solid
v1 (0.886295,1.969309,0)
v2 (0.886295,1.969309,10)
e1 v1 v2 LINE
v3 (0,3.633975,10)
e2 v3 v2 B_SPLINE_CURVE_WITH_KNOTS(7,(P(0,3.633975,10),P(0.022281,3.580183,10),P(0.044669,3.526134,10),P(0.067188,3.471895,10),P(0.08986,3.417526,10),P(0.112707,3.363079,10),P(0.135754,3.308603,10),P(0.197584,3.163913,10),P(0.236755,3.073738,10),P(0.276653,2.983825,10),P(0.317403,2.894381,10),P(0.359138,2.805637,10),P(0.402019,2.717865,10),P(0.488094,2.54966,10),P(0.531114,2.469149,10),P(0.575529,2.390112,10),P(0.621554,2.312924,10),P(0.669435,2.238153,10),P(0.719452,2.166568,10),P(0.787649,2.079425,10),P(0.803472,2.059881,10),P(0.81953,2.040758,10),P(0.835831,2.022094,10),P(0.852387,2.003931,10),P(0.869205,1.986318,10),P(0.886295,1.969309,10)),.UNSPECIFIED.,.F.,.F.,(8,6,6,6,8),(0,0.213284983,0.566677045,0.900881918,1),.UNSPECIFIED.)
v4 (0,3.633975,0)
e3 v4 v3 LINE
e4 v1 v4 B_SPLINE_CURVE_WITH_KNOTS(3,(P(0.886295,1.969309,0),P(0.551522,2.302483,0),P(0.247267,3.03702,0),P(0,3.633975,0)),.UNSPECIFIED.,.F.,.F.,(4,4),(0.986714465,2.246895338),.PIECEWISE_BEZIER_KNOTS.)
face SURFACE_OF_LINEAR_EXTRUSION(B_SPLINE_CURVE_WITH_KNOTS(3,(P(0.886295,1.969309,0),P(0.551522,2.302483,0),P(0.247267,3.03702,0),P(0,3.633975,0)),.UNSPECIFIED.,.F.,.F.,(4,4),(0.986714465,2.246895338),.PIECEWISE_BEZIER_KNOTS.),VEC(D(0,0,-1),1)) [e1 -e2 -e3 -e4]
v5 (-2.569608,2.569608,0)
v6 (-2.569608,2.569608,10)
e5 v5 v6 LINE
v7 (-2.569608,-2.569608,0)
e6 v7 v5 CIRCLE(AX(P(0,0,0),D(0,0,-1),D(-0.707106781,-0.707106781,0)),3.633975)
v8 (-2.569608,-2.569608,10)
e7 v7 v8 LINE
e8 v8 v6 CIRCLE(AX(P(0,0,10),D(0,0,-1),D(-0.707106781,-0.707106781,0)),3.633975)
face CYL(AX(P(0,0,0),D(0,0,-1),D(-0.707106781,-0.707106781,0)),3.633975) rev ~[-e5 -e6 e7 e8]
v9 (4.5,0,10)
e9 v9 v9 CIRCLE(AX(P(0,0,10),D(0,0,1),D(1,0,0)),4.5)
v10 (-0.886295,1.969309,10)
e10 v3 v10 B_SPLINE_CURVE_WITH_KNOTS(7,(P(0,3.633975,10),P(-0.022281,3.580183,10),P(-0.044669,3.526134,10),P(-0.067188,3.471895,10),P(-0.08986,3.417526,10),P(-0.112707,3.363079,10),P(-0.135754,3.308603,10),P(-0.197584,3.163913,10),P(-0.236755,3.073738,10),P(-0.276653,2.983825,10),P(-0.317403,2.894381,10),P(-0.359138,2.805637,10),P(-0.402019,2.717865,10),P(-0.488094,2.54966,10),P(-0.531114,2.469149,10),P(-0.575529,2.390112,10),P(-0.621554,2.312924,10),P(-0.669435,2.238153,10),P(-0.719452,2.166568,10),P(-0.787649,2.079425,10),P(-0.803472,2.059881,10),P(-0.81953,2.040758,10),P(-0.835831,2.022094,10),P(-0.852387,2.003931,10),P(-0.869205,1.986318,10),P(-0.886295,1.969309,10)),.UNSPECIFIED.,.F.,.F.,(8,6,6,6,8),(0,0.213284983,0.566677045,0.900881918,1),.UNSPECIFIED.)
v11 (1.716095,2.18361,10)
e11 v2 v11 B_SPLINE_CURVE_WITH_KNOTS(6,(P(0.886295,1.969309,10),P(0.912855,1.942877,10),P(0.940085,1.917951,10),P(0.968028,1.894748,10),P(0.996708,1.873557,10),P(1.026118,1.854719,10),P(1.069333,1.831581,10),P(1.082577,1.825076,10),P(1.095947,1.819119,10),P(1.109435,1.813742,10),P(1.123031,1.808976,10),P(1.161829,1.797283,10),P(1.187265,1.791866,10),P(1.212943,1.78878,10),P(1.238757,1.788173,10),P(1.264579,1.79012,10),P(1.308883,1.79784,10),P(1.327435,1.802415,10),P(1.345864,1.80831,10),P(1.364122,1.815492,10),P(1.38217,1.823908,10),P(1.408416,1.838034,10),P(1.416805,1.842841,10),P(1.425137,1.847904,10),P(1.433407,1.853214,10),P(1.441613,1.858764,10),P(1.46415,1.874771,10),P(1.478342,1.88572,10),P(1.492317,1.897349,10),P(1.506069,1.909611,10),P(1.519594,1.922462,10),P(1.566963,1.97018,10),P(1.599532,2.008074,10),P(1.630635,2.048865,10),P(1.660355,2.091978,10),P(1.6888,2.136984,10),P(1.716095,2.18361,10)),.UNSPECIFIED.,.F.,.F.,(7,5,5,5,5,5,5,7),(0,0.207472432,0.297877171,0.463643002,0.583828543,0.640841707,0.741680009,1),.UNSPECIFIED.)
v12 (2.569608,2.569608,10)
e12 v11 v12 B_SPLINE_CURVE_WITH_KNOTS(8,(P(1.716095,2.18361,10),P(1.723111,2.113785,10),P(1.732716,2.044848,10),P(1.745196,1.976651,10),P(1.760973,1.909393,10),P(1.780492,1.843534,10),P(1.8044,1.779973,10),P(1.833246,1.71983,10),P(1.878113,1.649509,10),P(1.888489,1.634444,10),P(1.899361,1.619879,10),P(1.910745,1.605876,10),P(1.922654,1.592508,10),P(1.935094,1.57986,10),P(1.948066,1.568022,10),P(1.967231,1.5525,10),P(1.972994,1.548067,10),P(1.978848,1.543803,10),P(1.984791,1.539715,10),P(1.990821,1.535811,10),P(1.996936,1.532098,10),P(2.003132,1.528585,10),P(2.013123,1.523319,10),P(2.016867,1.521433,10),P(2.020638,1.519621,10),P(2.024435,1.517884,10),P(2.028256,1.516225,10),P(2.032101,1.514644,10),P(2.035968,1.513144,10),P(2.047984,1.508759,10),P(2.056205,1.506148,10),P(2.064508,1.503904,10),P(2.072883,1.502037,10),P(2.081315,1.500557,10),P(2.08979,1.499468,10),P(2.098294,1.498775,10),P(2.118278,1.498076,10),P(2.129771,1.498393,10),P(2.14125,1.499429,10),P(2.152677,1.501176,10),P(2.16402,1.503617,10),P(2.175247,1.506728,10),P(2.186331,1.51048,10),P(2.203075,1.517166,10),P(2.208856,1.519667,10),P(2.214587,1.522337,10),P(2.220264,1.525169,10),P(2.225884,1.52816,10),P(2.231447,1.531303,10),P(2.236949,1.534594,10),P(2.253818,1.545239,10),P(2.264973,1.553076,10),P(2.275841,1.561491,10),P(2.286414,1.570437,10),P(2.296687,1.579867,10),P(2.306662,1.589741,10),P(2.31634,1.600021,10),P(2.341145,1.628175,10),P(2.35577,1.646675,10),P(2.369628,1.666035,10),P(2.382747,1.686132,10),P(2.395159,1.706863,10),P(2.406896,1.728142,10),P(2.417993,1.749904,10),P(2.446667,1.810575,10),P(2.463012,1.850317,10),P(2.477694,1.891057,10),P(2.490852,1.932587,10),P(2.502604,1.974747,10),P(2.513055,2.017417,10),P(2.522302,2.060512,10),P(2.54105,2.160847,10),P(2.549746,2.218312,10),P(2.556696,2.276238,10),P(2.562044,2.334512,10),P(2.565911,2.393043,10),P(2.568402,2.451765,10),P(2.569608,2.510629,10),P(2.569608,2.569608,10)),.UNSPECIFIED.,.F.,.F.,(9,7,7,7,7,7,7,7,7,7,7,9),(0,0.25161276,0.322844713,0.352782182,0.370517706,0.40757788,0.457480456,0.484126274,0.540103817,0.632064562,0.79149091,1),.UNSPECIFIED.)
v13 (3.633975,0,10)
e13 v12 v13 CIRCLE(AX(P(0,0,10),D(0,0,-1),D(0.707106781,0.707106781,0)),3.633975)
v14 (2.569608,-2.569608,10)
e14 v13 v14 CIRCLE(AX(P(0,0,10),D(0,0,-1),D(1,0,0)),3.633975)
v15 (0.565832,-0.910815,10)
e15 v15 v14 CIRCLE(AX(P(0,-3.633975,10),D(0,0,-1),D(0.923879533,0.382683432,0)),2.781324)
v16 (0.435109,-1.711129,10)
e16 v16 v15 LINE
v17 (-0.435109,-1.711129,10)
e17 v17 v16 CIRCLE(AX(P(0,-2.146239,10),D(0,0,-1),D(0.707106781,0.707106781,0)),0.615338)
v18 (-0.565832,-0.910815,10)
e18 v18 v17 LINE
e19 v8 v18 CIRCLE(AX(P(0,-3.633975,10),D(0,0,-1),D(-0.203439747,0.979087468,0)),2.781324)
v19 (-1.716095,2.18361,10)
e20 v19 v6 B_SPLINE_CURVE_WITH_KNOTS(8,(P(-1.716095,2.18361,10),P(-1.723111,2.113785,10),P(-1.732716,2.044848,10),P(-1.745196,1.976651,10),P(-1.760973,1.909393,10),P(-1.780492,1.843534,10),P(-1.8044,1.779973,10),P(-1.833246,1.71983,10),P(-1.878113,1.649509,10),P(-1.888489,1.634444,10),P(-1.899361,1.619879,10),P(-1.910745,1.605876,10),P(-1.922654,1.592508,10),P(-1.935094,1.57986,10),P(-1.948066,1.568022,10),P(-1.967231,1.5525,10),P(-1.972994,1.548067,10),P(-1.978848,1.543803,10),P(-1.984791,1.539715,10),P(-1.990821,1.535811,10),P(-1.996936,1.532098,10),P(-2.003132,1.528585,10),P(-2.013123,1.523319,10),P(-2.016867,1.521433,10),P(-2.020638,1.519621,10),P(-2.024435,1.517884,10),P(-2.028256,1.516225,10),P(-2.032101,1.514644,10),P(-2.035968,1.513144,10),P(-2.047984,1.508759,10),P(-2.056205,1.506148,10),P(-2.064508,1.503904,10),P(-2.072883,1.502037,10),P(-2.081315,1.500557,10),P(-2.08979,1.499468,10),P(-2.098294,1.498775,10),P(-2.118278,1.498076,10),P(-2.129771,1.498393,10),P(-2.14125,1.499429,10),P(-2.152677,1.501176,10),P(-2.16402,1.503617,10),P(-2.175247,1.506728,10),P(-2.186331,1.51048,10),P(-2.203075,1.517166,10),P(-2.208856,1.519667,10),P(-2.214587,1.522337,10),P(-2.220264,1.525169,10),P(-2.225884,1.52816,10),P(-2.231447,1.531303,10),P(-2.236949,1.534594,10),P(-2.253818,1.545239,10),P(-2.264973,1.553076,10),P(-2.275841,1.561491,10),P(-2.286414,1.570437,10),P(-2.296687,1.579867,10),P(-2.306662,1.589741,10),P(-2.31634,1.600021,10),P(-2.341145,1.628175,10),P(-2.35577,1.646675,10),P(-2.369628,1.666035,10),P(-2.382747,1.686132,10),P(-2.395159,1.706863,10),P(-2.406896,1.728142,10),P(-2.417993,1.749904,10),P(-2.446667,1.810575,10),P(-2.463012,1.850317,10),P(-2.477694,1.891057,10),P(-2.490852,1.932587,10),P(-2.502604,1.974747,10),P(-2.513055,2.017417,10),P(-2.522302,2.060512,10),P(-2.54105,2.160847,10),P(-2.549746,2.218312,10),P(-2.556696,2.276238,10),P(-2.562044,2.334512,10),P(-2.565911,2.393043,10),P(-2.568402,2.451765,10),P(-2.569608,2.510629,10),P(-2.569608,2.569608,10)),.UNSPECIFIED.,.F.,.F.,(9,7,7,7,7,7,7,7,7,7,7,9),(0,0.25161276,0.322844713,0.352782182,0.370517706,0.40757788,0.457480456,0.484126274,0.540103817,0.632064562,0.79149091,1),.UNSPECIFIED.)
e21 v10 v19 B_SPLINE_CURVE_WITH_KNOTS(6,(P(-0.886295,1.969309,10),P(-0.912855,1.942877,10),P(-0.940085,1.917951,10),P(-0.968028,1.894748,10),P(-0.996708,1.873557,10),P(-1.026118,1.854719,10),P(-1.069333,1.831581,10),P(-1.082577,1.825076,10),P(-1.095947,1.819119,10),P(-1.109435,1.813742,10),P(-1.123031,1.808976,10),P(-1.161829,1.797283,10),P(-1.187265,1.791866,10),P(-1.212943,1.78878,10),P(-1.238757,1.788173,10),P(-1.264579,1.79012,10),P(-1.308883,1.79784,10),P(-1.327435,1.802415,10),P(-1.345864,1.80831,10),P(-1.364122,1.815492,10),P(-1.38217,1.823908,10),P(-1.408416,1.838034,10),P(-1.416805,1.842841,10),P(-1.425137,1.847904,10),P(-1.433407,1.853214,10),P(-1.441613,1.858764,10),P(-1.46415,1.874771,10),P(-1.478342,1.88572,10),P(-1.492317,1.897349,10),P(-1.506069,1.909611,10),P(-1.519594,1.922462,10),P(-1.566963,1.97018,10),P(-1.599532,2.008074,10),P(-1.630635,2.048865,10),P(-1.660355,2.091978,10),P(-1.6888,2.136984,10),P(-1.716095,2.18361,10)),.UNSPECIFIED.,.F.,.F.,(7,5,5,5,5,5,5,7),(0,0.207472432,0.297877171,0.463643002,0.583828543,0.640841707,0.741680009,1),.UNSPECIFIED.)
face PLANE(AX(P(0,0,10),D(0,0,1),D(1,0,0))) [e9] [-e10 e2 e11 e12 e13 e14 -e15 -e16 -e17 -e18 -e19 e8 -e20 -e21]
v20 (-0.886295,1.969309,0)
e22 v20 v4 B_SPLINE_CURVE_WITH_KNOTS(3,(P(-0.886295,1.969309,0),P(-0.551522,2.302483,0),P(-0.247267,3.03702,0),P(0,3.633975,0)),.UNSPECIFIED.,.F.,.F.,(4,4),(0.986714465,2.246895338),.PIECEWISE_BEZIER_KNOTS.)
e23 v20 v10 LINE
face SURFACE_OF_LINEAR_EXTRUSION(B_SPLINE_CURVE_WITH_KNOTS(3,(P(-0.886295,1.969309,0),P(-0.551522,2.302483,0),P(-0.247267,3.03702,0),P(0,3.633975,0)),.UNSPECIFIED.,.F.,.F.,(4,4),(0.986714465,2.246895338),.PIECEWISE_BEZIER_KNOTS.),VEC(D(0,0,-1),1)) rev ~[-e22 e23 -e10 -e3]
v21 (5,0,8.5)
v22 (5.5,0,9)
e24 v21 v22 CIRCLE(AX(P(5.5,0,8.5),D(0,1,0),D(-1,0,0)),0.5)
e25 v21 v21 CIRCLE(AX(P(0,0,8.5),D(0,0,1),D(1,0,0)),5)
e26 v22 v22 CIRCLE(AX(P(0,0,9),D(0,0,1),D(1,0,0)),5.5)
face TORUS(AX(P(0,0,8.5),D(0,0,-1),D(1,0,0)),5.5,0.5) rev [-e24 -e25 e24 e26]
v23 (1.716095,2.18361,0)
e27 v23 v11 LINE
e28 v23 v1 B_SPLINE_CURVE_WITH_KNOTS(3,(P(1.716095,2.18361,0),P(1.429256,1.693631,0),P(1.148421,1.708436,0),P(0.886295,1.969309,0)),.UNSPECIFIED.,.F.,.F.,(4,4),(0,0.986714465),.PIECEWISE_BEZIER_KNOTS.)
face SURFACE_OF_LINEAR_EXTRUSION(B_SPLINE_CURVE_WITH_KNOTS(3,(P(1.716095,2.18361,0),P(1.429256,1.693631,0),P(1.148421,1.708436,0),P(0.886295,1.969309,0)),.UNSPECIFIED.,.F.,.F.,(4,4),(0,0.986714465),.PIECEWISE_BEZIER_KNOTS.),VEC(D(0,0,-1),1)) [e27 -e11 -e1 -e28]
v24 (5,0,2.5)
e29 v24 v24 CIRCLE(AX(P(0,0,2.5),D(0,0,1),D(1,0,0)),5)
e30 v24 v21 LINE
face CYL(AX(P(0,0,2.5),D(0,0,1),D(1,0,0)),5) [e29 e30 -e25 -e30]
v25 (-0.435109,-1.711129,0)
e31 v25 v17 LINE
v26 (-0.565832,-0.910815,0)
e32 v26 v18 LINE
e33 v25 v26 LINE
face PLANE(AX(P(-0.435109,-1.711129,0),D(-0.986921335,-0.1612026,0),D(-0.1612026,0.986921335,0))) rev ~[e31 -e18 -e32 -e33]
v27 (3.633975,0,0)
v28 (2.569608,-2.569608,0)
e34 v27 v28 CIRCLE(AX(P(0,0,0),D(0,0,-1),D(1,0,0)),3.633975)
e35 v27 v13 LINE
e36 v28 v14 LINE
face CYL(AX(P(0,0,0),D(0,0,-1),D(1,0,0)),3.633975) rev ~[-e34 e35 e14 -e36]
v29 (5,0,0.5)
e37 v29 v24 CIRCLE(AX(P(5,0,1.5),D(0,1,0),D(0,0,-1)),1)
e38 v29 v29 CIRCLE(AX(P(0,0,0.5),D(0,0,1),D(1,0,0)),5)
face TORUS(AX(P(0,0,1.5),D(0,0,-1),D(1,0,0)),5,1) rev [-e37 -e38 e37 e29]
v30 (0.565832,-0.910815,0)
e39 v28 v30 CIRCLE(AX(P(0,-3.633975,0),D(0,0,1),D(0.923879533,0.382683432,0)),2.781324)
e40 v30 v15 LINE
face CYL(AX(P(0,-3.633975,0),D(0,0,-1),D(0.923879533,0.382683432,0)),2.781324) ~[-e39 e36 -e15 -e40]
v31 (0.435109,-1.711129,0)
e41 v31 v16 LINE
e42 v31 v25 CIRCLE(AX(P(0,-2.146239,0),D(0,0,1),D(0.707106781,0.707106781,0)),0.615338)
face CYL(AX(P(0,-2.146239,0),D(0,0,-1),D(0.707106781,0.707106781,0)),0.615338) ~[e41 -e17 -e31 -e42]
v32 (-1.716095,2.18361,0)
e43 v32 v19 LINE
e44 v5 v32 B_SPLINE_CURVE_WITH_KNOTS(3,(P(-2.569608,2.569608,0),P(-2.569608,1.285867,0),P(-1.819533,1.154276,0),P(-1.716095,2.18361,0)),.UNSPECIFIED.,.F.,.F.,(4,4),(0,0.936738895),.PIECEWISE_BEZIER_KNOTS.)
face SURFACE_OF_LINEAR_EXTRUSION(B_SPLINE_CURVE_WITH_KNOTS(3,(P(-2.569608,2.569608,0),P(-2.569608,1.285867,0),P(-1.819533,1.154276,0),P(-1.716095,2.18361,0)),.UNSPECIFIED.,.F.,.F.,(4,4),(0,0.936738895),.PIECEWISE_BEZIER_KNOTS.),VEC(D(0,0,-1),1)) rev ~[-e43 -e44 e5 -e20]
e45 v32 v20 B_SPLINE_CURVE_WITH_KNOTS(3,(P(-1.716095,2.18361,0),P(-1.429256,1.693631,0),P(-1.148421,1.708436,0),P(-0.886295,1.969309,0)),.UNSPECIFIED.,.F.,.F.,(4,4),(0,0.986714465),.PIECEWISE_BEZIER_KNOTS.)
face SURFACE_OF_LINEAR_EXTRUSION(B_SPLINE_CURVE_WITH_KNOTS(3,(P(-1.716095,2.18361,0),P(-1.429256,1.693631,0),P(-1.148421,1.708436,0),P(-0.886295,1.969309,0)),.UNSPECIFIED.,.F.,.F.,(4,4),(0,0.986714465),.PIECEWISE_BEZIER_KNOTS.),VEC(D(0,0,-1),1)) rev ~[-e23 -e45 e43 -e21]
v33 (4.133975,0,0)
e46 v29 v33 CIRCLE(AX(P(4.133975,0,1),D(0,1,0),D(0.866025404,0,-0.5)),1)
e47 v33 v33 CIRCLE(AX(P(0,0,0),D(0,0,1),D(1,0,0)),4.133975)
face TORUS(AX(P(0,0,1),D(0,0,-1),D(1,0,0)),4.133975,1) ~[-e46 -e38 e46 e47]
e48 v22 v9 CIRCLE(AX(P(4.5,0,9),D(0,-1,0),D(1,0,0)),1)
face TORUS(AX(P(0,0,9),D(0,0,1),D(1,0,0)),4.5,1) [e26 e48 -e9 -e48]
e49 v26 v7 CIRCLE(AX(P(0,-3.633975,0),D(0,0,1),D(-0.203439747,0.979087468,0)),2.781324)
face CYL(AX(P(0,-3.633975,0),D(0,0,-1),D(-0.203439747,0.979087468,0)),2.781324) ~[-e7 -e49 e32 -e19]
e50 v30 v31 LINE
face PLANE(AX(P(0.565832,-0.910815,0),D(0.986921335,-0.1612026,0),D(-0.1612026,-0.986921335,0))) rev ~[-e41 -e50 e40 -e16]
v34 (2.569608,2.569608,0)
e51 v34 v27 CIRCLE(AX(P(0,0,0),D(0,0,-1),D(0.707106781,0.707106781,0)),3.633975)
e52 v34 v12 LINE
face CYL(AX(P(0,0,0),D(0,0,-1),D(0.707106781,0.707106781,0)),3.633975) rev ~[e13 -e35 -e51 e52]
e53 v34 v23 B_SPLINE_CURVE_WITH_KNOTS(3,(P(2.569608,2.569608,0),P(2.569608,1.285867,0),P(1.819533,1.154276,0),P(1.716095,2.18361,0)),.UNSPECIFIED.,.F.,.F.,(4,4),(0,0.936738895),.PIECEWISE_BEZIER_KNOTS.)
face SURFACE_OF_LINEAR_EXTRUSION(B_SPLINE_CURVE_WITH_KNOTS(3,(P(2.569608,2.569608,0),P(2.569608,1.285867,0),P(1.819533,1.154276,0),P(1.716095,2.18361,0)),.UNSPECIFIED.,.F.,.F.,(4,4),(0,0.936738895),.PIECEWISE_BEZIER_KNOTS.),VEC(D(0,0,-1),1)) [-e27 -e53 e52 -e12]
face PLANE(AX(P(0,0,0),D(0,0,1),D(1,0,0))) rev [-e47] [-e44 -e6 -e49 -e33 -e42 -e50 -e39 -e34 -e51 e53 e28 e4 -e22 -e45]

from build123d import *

# Parameters (mm, degrees)
F0_W     = 3.5
F0_H     = 10
F4_DEPTH = 25


# Not quite as in the source:
# - a fillet or chamfer that OpenCascade refuses, or shapes differently, is made with other operations: its cross-section is extruded or revolved along the edge and cut away or added


with BuildPart() as f1:
    # F0 (on Front) → F1 (revolve)
    with BuildSketch(Plane.XZ):
        with BuildLine():
            add(Edge.make_bspline(
                [(5, 10), (4.0942793712, 10), (3.5, 3.2143939752), (3.5, 0)],
                knots=[0, 0, 0, 0, 10.1118742081, 10.1118742081, 10.1118742081, 10.1118742081], degree=3))
            Line((3.5, 0), (5, 0))
            Line((5, 0), (5, 0.5))
            ThreePointArc((5, 0.5), (4, 1.5), (5, 2.5))
            Line((5, 2.5), (5, 8.5))
            ThreePointArc((5, 8.5), (5.1464466094, 8.8535533906), (5.5, 9))
            Line((5.5, 9), (5.5, 10))
            Line((5.5, 10), (5, 10))
        make_face()
        with Locations((1.75, 5)):
            Rectangle(F0_W, F0_H)
        with BuildLine():
            Line((3.5, 10), (3.5, 0))
            add(Edge.make_bspline(
                [(5, 10), (4.0942793712, 10), (3.5, 3.2143939752), (3.5, 0)],
                knots=[0, 0, 0, 0, 10.1118742081, 10.1118742081, 10.1118742081, 10.1118742081], degree=3))
            Line((5, 10), (3.5, 10))
        make_face()
    revolve(axis=Axis((0, 0, 5), (0, 0, 1)))

    # F2: fillet of radius 1 on 2 edges, made by hand

    # F2_s1 → F2_t2 (revolve, cut)
    with BuildSketch(Plane.XZ):
        with BuildLine():
            ThreePointArc((5, 0.5), (4.6339745962, 0.1339745962), (4.1339745962, 0))
            Line((4.1339745962, 0), (5, 0))
            Line((5, 0), (5, 0.5))
        make_face()
    revolve(axis=Axis((0, 0, 0), (0, 0, 1)), mode=Mode.SUBTRACT)

    # F2_s3 → F2_t4 (revolve, cut)
    with BuildSketch(Plane.XZ):
        with BuildLine():
            ThreePointArc((5.5, 9), (5.2071067812, 9.7071067812), (4.5, 10))
            Line((4.5, 10), (5.5, 10))
            Line((5.5, 10), (5.5, 9))
        make_face()
    revolve(axis=Axis((0, 0, 10), (0, 0, 1)), mode=Mode.SUBTRACT)

    # F3 (on face) → F4 (cut)
    with BuildSketch(Plane(origin=(0, 0, 0), x_dir=(1, 0, 0), z_dir=(0, 0, -1))):
        with BuildLine():
            ThreePointArc((2.5696080796, -2.5696080796), (3.3573547511, -1.3906618716), (3.6339745962, 0))
            ThreePointArc((3.6339745962, 0), (3.3573547511, 1.3906618716), (2.5696080796, 2.5696080796))
            ThreePointArc((2.5696080796, 2.5696080796), (1.7735963788, 1.4915186107), (0.5658317976, 0.9108153755))
            ThreePointArc((0.5658317976, 0.9108153755), (0.2844067223, 0.8672301951), (0, 0.852650853))
            ThreePointArc((0, 0.852650853), (-0.2844067223, 0.8672301951), (-0.5658317976, 0.9108153755))
            ThreePointArc((-0.5658317976, 0.9108153755), (-1.7735963788, 1.4915186107), (-2.5696080796, 2.5696080796))
            ThreePointArc((-2.5696080796, 2.5696080796), (-3.6339745962, 0), (-2.5696080796, -2.5696080796))
            add(Edge.make_bspline(
                [(-2.5696080796, -2.5696080796), (-2.5696080796, -1.2858674651), (-1.8195327018, -1.1542756278), (-1.7160946607, -2.1836098922)],
                knots=[0, 0, 0, 0, 0.9367388948, 0.9367388948, 0.9367388948, 0.9367388948], degree=3))
            add(Edge.make_bspline(
                [(-1.7160946607, -2.1836098922), (-1.4292562782, -1.6936314013), (-1.1484208124, -1.7084361716), (-0.8862952606, -1.9693091494)],
                knots=[0, 0, 0, 0, 0.986714465, 0.986714465, 0.986714465, 0.986714465], degree=3))
            ThreePointArc((-0.8862952606, -1.9693091494), (0, -1.8935369514), (0.8862952606, -1.9693091494))
            add(Edge.make_bspline(
                [(1.7160946607, -2.1836098922), (1.4292562782, -1.6936314013), (1.1484208124, -1.7084361716), (0.8862952606, -1.9693091494)],
                knots=[0, 0, 0, 0, 0.986714465, 0.986714465, 0.986714465, 0.986714465], degree=3))
            add(Edge.make_bspline(
                [(2.5696080796, -2.5696080796), (2.5696080796, -1.2858674651), (1.8195327018, -1.1542756278), (1.7160946607, -2.1836098922)],
                knots=[0, 0, 0, 0, 0.9367388948, 0.9367388948, 0.9367388948, 0.9367388948], degree=3))
        make_face()
        with BuildLine():
            ThreePointArc((0, 0.852650853), (0.2844067223, 0.8672301951), (0.5658317976, 0.9108153755))
            Line((0.5658317976, 0.9108153755), (0.4351094112, 1.7111294663))
            ThreePointArc((0.4351094112, 1.7111294663), (0, 1.5309012471), (-0.4351094112, 1.7111294663))
            Line((-0.4351094112, 1.7111294663), (-0.5658317976, 0.9108153755))
            ThreePointArc((-0.5658317976, 0.9108153755), (-0.2844067223, 0.8672301951), (0, 0.852650853))
        make_face()
        with BuildLine():
            add(Edge.make_bspline(
                [(-0.8862952606, -1.9693091494), (-0.5515220121, -2.3024826748), (-0.2472666579, -3.0370200771), (0, -3.6339745962)],
                knots=[0.986714465, 0.986714465, 0.986714465, 0.986714465, 2.2468953379, 2.2468953379, 2.2468953379, 2.2468953379], degree=3))
            add(Edge.make_bspline(
                [(0.8862952606, -1.9693091494), (0.5515220121, -2.3024826748), (0.2472666579, -3.0370200771), (0, -3.6339745962)],
                knots=[0.986714465, 0.986714465, 0.986714465, 0.986714465, 2.2468953379, 2.2468953379, 2.2468953379, 2.2468953379], degree=3))
            ThreePointArc((0.8862952606, -1.9693091494), (0, -1.8935369514), (-0.8862952606, -1.9693091494))
        make_face()
    extrude(amount=-F4_DEPTH, mode=Mode.SUBTRACT)


solid = f1.part
